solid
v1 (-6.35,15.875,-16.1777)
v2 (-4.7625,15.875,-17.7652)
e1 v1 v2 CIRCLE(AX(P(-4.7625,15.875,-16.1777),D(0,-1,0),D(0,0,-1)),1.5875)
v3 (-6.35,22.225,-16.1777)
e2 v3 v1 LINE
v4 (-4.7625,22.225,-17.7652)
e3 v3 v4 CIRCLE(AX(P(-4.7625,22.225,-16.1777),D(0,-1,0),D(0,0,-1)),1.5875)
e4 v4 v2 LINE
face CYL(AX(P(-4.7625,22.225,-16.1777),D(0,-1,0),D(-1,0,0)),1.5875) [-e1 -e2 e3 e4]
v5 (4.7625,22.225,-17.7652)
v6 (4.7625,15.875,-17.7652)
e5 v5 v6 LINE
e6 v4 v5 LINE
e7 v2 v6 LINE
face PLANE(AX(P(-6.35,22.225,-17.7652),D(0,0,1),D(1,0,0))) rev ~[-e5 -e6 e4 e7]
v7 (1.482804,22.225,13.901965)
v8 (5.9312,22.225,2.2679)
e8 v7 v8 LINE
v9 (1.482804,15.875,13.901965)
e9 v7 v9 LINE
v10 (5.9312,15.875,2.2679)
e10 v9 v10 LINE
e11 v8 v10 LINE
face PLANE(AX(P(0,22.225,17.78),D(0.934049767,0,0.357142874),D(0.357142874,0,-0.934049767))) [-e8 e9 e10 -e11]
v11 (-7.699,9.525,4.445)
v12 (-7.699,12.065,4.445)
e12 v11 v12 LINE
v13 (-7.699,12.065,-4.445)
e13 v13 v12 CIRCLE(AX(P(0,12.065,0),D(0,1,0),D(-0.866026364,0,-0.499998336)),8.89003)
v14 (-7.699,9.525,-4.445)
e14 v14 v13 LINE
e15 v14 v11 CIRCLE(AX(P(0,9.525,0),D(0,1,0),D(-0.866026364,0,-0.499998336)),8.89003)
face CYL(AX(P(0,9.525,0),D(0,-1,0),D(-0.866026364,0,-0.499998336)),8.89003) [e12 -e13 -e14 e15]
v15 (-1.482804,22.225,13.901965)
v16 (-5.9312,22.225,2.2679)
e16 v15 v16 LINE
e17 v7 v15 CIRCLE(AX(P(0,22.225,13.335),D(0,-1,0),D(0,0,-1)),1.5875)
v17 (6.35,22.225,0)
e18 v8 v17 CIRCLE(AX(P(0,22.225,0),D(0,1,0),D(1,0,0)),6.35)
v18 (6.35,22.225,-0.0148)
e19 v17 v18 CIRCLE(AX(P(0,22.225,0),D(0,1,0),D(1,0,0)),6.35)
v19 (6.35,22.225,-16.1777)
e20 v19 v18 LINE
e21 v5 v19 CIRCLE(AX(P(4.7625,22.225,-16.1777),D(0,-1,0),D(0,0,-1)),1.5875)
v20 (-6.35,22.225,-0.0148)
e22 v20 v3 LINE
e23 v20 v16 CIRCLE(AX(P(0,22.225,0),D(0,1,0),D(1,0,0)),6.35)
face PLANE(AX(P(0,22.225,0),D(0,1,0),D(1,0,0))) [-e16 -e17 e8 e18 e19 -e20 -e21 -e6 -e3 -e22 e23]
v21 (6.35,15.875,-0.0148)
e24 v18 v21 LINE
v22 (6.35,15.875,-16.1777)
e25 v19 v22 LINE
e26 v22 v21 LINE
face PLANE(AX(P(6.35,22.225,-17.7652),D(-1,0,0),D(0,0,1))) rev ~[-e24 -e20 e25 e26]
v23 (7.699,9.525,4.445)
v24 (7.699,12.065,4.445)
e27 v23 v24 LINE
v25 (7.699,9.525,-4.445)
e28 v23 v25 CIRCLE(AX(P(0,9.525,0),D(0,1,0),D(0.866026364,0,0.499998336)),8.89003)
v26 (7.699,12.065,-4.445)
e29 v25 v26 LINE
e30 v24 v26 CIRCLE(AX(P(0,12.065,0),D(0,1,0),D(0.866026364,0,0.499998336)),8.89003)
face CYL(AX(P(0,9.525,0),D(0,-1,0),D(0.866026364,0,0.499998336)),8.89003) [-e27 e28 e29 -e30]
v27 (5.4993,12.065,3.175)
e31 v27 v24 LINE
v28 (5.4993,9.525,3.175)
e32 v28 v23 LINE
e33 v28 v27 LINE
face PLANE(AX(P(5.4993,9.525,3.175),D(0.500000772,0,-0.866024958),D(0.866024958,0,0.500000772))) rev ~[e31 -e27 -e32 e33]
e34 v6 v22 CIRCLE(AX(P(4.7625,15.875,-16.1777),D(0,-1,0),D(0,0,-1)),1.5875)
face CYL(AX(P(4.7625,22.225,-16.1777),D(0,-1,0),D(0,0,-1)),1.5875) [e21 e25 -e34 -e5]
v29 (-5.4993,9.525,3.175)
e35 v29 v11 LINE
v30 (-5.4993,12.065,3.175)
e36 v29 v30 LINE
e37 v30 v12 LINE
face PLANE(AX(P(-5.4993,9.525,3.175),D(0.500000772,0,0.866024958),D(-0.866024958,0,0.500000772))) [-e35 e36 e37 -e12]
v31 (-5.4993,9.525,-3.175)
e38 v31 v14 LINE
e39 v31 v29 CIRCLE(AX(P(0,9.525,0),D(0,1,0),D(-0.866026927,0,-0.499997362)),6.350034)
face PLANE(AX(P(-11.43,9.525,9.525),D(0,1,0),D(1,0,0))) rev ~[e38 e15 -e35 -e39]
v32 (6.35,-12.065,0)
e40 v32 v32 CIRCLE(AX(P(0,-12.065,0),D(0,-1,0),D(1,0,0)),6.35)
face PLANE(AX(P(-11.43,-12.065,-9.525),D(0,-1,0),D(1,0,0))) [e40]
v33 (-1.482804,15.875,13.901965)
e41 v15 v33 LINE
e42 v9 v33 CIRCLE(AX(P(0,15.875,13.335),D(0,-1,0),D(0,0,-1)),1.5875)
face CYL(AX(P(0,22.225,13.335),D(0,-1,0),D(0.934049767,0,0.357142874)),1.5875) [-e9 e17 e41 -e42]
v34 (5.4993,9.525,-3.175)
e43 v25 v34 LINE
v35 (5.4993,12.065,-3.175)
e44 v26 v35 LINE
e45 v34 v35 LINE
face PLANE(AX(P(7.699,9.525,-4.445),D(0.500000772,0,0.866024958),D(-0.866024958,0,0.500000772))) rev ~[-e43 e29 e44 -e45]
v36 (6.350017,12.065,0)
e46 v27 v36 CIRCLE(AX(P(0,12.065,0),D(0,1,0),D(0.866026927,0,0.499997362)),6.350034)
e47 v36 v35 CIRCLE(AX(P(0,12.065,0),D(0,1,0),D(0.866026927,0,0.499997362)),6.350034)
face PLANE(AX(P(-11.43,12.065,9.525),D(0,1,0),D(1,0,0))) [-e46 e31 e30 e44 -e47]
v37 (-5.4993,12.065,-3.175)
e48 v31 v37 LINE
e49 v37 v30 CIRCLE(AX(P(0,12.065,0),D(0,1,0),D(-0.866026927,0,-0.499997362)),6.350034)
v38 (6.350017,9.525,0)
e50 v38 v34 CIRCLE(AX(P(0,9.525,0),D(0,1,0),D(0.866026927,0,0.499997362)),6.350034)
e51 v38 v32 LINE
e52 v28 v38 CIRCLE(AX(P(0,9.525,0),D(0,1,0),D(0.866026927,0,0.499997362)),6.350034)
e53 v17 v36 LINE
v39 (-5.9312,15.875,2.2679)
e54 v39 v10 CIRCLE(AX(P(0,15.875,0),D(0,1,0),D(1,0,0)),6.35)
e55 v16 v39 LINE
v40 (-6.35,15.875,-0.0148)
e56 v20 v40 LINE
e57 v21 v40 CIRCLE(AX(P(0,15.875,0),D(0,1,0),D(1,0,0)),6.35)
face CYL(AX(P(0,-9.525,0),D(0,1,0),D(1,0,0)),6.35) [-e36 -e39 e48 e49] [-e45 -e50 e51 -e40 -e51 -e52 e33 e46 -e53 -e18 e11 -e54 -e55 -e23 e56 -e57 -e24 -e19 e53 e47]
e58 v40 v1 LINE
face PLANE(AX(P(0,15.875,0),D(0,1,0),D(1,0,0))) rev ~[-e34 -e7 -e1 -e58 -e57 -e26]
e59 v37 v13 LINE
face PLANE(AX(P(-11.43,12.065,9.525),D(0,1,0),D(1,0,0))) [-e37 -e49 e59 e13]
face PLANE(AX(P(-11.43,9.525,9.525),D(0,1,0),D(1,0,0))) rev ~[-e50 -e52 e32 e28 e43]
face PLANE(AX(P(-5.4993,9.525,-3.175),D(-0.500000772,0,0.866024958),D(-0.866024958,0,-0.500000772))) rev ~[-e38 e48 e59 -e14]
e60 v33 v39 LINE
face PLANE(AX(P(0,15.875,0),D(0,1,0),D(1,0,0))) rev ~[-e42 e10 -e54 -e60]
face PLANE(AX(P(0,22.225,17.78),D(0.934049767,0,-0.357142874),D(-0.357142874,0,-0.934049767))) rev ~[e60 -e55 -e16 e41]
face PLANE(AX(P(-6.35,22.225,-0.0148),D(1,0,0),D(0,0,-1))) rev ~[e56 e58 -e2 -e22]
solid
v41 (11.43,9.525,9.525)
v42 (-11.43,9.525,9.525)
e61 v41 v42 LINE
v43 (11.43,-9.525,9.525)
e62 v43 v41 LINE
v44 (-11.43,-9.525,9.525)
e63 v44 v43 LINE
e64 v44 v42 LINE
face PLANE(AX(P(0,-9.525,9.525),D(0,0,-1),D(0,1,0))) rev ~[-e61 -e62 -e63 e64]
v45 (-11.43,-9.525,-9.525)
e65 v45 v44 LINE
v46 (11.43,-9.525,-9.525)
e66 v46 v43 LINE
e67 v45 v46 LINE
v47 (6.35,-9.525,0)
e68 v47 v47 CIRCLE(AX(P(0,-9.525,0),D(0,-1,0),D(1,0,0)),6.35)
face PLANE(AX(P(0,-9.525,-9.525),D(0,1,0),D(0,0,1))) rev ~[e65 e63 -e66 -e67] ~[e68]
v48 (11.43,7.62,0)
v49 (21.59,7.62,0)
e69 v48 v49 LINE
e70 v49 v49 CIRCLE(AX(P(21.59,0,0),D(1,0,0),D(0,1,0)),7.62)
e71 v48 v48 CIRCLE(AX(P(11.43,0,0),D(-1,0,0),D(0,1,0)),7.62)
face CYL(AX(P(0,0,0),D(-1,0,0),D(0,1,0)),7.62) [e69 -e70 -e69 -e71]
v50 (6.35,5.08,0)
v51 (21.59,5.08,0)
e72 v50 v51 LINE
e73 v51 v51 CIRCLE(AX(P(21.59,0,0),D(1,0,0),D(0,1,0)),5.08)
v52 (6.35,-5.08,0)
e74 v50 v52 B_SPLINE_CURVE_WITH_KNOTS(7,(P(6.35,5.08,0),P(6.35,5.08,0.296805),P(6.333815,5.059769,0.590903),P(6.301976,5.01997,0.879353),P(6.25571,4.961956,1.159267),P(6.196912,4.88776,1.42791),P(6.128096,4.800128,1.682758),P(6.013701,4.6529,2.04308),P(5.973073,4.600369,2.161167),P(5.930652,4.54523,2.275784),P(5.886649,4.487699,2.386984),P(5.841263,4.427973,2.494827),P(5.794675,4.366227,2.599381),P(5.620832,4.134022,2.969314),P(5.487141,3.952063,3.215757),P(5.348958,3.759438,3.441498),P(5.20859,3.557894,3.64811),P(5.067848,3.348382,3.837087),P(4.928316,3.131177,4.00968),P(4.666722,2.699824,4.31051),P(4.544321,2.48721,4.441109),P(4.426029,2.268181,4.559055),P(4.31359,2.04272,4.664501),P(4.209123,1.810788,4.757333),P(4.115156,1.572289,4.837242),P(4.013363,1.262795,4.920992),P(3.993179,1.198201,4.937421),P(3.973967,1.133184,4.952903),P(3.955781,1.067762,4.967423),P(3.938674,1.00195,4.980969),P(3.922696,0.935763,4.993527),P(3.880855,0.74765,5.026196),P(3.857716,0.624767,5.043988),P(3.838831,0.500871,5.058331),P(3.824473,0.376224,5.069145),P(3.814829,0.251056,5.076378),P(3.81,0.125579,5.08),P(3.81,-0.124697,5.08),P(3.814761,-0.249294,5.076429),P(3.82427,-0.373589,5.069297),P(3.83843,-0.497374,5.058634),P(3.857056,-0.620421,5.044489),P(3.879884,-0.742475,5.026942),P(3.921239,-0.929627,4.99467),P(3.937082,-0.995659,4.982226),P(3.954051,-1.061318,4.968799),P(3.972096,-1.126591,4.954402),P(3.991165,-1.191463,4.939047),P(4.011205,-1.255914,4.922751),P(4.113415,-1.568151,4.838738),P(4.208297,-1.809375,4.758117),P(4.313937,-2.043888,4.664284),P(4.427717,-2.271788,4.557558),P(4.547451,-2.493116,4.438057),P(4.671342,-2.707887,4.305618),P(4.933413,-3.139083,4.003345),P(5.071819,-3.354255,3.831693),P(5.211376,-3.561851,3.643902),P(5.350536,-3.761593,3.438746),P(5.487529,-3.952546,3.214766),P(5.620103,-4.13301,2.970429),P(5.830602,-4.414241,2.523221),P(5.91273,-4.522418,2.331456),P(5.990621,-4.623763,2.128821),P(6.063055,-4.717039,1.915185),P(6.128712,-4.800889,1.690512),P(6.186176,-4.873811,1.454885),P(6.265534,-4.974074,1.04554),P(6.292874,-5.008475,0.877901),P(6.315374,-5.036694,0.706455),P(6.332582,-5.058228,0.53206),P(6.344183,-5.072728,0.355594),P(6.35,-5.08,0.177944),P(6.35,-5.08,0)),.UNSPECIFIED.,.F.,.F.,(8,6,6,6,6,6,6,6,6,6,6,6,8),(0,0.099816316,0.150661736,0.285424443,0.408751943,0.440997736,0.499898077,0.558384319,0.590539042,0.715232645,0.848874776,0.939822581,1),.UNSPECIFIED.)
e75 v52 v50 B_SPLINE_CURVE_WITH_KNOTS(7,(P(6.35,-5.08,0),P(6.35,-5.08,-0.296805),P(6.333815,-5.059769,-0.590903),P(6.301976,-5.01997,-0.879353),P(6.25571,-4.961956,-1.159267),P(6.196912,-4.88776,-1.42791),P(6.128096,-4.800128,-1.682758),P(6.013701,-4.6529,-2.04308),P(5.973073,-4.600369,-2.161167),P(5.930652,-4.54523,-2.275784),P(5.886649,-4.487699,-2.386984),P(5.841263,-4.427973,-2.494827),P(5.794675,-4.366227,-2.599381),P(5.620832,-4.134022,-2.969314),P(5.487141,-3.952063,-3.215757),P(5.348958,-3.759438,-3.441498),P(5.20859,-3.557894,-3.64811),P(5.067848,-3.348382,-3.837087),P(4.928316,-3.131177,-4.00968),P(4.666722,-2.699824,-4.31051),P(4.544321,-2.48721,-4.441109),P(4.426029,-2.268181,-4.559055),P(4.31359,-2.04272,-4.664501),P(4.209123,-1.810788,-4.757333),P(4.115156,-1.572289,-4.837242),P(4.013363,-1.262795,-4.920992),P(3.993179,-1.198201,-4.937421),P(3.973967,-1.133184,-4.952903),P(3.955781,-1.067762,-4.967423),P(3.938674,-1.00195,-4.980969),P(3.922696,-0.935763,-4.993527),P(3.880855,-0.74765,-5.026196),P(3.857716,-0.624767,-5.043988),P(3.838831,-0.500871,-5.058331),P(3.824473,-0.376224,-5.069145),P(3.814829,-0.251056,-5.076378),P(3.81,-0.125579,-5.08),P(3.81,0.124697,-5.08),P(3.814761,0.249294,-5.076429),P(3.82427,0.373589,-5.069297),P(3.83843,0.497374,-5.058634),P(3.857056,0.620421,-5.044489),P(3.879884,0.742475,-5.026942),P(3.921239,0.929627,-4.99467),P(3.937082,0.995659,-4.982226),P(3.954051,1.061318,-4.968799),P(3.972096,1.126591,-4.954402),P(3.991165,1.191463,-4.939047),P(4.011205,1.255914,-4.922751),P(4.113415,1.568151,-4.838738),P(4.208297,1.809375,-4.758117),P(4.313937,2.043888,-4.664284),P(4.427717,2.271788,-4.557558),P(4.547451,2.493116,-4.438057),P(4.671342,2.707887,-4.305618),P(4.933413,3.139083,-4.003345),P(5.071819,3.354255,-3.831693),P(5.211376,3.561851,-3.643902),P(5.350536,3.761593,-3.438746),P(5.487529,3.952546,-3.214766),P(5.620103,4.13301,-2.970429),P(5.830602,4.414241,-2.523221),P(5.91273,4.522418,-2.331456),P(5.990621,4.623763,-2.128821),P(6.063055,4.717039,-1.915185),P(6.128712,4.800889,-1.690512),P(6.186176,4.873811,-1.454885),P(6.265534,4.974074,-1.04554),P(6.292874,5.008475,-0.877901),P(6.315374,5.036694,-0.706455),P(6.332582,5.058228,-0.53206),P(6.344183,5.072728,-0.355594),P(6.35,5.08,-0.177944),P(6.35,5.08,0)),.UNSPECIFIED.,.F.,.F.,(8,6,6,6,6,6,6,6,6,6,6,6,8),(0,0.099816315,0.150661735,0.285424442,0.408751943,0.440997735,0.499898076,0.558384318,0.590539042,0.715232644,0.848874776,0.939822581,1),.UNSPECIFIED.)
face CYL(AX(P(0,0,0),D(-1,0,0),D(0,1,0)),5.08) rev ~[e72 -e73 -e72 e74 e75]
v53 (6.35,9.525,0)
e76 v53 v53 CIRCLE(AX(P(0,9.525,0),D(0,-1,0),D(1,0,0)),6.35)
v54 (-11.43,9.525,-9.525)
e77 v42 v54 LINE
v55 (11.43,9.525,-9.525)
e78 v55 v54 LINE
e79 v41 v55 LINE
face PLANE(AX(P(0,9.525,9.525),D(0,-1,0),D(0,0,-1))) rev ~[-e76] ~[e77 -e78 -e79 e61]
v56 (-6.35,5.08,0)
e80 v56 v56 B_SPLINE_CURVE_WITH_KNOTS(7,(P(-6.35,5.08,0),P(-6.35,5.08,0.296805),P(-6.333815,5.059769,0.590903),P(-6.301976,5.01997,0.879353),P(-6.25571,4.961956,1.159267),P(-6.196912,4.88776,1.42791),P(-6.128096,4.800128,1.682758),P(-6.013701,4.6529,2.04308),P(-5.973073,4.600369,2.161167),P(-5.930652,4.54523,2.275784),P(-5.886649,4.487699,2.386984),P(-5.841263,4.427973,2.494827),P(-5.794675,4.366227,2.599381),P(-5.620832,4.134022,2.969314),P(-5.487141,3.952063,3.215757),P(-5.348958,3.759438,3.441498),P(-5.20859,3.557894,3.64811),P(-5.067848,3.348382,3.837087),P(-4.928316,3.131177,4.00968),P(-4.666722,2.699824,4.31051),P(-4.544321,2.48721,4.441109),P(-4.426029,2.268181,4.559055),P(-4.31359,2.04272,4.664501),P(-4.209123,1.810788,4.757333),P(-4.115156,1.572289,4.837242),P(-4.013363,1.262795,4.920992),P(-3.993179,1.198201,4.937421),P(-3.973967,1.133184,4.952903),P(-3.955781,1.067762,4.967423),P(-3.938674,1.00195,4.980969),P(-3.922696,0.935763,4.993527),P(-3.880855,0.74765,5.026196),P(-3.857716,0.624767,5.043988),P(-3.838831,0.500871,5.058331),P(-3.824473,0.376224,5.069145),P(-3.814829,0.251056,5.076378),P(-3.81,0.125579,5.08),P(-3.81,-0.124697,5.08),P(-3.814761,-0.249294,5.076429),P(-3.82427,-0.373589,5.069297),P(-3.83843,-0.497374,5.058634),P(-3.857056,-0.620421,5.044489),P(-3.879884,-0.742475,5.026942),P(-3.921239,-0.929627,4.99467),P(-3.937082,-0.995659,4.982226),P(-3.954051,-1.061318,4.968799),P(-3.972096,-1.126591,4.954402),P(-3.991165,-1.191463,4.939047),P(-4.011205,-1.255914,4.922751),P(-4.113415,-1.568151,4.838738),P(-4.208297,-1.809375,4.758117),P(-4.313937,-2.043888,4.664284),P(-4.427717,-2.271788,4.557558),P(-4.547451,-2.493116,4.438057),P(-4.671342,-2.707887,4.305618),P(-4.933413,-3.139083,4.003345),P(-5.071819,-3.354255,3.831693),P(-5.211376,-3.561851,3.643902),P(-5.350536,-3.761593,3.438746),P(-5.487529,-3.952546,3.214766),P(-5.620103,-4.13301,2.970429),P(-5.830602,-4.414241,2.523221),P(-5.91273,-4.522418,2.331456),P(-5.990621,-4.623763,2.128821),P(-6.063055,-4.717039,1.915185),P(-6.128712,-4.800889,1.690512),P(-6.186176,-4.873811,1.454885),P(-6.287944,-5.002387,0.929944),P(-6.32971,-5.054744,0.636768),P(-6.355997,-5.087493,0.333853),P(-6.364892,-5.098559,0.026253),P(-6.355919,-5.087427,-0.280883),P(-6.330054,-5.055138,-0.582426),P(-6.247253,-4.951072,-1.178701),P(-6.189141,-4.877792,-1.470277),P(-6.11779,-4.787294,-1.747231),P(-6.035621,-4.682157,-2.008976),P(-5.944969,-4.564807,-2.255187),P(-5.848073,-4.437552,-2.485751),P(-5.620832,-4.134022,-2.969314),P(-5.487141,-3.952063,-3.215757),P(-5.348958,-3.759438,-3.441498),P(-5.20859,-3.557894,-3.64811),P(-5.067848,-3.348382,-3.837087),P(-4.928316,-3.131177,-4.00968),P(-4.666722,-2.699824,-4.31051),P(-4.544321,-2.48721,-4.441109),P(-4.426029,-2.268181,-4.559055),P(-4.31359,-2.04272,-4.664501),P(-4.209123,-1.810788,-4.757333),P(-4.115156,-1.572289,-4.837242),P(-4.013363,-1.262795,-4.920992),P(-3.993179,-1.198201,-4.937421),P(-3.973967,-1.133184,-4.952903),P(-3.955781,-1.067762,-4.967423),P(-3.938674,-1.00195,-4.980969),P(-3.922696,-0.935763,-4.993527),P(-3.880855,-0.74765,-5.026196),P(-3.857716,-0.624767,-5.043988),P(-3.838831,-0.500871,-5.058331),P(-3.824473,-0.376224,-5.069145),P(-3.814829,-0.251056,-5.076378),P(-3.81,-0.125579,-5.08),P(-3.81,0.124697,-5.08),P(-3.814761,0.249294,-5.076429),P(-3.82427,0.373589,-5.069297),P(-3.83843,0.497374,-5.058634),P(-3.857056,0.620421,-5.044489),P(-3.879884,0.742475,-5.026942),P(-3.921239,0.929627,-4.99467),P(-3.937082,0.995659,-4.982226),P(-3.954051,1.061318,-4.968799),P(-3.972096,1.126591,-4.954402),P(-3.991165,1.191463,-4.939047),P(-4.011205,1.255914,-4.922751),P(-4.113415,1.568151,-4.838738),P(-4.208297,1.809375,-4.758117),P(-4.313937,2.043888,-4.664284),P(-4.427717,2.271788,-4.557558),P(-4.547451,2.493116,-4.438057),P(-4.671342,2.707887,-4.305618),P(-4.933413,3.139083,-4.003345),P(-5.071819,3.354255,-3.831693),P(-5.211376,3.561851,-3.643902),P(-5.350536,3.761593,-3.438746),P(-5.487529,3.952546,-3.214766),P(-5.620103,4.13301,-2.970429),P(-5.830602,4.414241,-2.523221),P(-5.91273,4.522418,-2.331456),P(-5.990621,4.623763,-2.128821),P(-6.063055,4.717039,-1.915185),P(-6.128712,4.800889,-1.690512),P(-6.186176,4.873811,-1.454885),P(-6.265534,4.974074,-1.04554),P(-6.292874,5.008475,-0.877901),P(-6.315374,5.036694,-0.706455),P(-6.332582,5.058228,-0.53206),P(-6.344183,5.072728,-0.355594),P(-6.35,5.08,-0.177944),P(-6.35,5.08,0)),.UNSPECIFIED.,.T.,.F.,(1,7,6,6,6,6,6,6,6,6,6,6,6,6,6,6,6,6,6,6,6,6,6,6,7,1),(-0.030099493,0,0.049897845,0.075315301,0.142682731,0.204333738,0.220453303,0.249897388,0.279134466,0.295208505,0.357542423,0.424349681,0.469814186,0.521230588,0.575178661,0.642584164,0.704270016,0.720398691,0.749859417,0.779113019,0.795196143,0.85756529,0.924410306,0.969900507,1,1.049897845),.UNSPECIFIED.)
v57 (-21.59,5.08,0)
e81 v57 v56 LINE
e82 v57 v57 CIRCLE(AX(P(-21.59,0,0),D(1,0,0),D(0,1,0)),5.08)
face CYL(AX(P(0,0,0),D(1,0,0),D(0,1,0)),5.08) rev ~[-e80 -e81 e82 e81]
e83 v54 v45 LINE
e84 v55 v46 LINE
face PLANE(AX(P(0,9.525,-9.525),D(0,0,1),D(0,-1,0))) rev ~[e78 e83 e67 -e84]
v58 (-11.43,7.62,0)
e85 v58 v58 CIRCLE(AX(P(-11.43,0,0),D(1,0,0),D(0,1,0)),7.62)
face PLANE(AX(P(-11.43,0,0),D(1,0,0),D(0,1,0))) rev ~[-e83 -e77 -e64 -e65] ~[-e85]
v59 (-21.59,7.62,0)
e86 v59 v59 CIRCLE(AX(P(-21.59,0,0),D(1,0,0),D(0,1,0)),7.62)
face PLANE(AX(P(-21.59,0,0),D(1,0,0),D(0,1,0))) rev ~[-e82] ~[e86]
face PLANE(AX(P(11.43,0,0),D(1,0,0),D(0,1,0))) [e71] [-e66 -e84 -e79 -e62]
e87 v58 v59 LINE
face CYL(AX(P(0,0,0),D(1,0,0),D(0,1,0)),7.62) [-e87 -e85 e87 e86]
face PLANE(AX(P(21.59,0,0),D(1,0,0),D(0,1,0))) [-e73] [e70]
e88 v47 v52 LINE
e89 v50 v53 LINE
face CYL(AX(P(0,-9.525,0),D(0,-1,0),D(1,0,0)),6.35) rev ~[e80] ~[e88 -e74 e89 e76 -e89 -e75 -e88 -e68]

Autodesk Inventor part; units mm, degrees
ref_plane "YZ Plane" through (0, 0, 0) normal (1, 0, 0) x (0, 1, 0)
ref_plane "XZ Plane" through (0, 0, 0) normal (0, 1, 0) x (-1, 0, 0)
ref_plane "XY Plane" through (0, 0, 0) normal (0, 0, 1) x (1, 0, 0)
sketch "Sketch1" plane through (0, 0, 0) normal (1, 0, 0) x (0, 1, 0)
  line L0 (-9.525, 9.525) -> (9.525, 9.525)
  line L1 (9.525, 9.525) -> (9.525, -9.525)
  line L2 (9.525, -9.525) -> (-9.525, -9.525)
  line L3 (-9.525, -9.525) -> (-9.525, 9.525)
  line L4 (-9.525, 9.525) -> (9.525, -9.525) construction
  line L5 (9.525, 9.525) -> (-9.525, -9.525) construction
  circle A0 centre (0, 0) radius 5.08
  circle A1 centre (0, 0) radius 7.62
  dimension "d0" = 19.05
  dimension "d1" = 19.05
  dimension "d2" = 10.16
  dimension "d5" = 15.24
extrude "Extrusion1" add sketch "Sketch1" along normal mid plane 22.86 contours L0 L1 L2 L3 | A1
extrude "Extrusion2" add sketch "Sketch1" along normal mid plane 43.18 contours A1
sketch "Sketch2" plane through (-11.43, -9.525, -9.525) normal (0, -1, 0) x (1, 0, 0)
  circle A0 centre (11.43, 9.525) radius 6.35
  dimension "d8" = 12.7
extrude "Extrusion3" cut sketch "Sketch2" against normal through all
sketch "Sketch3" plane through (-11.43, -9.525, -9.525) normal (0, -1, 0) x (1, 0, 0)
  circle A0 centre (11.43, 9.525) radius 6.35 projected
extrude "Extrusion4" add sketch "Sketch3" along normal blind 2.54 separate body
sketch "Sketch4" plane through (0, -9.525, 0) normal (0, 1, 0) x (1, 0, 0)
  circle A0 centre (0, 0) radius 6.35 projected
extrude "Extrusion5" add sketch "Sketch4" along normal blind 31.75 bodies 2
sketch "Sketch5" plane through (-11.43, 9.525, 9.525) normal (0, 1, 0) x (1, 0, 0)
  circle A0 centre (11.43, 9.525) radius 6.35 construction
  circle A1 centre (11.43, 9.525) radius 8.89 construction
  line L0 (2.54, 9.525) -> (20.32, 9.525) construction
  line L1 (3.731, 5.08) -> (19.129, 13.97) construction
  line L2 (3.731, 13.97) -> (19.129, 5.08) construction
  circle A2 centre (11.43, 9.525) radius 6.35 construction
  arc A3 (16.9293, 6.35) -> (16.9293, 12.7) centre (11.43, 9.525) ccw
  arc A4 (19.129, 5.08) -> (19.129, 13.97) centre (11.43, 9.525) ccw
  arc A5 (5.9307, 12.7) -> (5.9307, 6.35) centre (11.43, 9.525) ccw
  arc A6 (3.731, 13.97) -> (3.731, 5.08) centre (11.43, 9.525) ccw
  line L3 (5.9307, 12.7) -> (3.731, 13.97)
  line L4 (5.9307, 6.35) -> (3.731, 5.08)
  line L5 (19.129, 13.97) -> (16.9293, 12.7)
  line L6 (16.9293, 6.35) -> (19.129, 5.08)
  dimension "d15" = 17.78
  dimension "d16" = 30
  dimension "d17" = 30
extrude "Extrusion6" add sketch "Sketch5" along normal blind 2.54 bodies 2
sketch "Sketch6" plane through (0, 22.225, 0) normal (0, 1, 0) x (1, 0, 0)
  circle A0 centre (0, 0) radius 6.35 projected
  line L0 (0, 0) -> (0, 17.78) construction
  circle A1 centre (0, 0) radius 6.35 construction
  line L1 (-6.35, 17.7652) -> (6.35, 17.7652)
  line L2 (6.35, 17.7652) -> (6.35, 0.0148)
  line L3 (6.35, 0.0148) -> (-6.35, 0.0148)
  line L4 (-6.35, 0.0148) -> (-6.35, 17.7652)
  line L5 (-6.35, 17.7652) -> (6.35, 0.0148) construction
  line L6 (6.35, 17.7652) -> (-6.35, 0.0148) construction
  line L7 (0, 0) -> (0, -17.78) construction
  line L8 (0, -17.78) -> (5.9312, -2.2679)
  line L9 (0, -17.78) -> (-5.9312, -2.2679)
  circle A2 centre (0, 0) radius 6.35 projected
  point P0 (0, 8.89)
  dimension "d20" = 17.78
  dimension "d21" = 17.78
extrude "Extrusion7" add sketch "Sketch6" against normal blind 6.35 bodies 2
fillet "Fillet1" radius 1.5875 3 edges at (0, 19.05, 17.78) (6.35, 19.05, -17.7652) (-6.35, 19.05, -17.7652)
properties part number "BBBB" material "Brass"
